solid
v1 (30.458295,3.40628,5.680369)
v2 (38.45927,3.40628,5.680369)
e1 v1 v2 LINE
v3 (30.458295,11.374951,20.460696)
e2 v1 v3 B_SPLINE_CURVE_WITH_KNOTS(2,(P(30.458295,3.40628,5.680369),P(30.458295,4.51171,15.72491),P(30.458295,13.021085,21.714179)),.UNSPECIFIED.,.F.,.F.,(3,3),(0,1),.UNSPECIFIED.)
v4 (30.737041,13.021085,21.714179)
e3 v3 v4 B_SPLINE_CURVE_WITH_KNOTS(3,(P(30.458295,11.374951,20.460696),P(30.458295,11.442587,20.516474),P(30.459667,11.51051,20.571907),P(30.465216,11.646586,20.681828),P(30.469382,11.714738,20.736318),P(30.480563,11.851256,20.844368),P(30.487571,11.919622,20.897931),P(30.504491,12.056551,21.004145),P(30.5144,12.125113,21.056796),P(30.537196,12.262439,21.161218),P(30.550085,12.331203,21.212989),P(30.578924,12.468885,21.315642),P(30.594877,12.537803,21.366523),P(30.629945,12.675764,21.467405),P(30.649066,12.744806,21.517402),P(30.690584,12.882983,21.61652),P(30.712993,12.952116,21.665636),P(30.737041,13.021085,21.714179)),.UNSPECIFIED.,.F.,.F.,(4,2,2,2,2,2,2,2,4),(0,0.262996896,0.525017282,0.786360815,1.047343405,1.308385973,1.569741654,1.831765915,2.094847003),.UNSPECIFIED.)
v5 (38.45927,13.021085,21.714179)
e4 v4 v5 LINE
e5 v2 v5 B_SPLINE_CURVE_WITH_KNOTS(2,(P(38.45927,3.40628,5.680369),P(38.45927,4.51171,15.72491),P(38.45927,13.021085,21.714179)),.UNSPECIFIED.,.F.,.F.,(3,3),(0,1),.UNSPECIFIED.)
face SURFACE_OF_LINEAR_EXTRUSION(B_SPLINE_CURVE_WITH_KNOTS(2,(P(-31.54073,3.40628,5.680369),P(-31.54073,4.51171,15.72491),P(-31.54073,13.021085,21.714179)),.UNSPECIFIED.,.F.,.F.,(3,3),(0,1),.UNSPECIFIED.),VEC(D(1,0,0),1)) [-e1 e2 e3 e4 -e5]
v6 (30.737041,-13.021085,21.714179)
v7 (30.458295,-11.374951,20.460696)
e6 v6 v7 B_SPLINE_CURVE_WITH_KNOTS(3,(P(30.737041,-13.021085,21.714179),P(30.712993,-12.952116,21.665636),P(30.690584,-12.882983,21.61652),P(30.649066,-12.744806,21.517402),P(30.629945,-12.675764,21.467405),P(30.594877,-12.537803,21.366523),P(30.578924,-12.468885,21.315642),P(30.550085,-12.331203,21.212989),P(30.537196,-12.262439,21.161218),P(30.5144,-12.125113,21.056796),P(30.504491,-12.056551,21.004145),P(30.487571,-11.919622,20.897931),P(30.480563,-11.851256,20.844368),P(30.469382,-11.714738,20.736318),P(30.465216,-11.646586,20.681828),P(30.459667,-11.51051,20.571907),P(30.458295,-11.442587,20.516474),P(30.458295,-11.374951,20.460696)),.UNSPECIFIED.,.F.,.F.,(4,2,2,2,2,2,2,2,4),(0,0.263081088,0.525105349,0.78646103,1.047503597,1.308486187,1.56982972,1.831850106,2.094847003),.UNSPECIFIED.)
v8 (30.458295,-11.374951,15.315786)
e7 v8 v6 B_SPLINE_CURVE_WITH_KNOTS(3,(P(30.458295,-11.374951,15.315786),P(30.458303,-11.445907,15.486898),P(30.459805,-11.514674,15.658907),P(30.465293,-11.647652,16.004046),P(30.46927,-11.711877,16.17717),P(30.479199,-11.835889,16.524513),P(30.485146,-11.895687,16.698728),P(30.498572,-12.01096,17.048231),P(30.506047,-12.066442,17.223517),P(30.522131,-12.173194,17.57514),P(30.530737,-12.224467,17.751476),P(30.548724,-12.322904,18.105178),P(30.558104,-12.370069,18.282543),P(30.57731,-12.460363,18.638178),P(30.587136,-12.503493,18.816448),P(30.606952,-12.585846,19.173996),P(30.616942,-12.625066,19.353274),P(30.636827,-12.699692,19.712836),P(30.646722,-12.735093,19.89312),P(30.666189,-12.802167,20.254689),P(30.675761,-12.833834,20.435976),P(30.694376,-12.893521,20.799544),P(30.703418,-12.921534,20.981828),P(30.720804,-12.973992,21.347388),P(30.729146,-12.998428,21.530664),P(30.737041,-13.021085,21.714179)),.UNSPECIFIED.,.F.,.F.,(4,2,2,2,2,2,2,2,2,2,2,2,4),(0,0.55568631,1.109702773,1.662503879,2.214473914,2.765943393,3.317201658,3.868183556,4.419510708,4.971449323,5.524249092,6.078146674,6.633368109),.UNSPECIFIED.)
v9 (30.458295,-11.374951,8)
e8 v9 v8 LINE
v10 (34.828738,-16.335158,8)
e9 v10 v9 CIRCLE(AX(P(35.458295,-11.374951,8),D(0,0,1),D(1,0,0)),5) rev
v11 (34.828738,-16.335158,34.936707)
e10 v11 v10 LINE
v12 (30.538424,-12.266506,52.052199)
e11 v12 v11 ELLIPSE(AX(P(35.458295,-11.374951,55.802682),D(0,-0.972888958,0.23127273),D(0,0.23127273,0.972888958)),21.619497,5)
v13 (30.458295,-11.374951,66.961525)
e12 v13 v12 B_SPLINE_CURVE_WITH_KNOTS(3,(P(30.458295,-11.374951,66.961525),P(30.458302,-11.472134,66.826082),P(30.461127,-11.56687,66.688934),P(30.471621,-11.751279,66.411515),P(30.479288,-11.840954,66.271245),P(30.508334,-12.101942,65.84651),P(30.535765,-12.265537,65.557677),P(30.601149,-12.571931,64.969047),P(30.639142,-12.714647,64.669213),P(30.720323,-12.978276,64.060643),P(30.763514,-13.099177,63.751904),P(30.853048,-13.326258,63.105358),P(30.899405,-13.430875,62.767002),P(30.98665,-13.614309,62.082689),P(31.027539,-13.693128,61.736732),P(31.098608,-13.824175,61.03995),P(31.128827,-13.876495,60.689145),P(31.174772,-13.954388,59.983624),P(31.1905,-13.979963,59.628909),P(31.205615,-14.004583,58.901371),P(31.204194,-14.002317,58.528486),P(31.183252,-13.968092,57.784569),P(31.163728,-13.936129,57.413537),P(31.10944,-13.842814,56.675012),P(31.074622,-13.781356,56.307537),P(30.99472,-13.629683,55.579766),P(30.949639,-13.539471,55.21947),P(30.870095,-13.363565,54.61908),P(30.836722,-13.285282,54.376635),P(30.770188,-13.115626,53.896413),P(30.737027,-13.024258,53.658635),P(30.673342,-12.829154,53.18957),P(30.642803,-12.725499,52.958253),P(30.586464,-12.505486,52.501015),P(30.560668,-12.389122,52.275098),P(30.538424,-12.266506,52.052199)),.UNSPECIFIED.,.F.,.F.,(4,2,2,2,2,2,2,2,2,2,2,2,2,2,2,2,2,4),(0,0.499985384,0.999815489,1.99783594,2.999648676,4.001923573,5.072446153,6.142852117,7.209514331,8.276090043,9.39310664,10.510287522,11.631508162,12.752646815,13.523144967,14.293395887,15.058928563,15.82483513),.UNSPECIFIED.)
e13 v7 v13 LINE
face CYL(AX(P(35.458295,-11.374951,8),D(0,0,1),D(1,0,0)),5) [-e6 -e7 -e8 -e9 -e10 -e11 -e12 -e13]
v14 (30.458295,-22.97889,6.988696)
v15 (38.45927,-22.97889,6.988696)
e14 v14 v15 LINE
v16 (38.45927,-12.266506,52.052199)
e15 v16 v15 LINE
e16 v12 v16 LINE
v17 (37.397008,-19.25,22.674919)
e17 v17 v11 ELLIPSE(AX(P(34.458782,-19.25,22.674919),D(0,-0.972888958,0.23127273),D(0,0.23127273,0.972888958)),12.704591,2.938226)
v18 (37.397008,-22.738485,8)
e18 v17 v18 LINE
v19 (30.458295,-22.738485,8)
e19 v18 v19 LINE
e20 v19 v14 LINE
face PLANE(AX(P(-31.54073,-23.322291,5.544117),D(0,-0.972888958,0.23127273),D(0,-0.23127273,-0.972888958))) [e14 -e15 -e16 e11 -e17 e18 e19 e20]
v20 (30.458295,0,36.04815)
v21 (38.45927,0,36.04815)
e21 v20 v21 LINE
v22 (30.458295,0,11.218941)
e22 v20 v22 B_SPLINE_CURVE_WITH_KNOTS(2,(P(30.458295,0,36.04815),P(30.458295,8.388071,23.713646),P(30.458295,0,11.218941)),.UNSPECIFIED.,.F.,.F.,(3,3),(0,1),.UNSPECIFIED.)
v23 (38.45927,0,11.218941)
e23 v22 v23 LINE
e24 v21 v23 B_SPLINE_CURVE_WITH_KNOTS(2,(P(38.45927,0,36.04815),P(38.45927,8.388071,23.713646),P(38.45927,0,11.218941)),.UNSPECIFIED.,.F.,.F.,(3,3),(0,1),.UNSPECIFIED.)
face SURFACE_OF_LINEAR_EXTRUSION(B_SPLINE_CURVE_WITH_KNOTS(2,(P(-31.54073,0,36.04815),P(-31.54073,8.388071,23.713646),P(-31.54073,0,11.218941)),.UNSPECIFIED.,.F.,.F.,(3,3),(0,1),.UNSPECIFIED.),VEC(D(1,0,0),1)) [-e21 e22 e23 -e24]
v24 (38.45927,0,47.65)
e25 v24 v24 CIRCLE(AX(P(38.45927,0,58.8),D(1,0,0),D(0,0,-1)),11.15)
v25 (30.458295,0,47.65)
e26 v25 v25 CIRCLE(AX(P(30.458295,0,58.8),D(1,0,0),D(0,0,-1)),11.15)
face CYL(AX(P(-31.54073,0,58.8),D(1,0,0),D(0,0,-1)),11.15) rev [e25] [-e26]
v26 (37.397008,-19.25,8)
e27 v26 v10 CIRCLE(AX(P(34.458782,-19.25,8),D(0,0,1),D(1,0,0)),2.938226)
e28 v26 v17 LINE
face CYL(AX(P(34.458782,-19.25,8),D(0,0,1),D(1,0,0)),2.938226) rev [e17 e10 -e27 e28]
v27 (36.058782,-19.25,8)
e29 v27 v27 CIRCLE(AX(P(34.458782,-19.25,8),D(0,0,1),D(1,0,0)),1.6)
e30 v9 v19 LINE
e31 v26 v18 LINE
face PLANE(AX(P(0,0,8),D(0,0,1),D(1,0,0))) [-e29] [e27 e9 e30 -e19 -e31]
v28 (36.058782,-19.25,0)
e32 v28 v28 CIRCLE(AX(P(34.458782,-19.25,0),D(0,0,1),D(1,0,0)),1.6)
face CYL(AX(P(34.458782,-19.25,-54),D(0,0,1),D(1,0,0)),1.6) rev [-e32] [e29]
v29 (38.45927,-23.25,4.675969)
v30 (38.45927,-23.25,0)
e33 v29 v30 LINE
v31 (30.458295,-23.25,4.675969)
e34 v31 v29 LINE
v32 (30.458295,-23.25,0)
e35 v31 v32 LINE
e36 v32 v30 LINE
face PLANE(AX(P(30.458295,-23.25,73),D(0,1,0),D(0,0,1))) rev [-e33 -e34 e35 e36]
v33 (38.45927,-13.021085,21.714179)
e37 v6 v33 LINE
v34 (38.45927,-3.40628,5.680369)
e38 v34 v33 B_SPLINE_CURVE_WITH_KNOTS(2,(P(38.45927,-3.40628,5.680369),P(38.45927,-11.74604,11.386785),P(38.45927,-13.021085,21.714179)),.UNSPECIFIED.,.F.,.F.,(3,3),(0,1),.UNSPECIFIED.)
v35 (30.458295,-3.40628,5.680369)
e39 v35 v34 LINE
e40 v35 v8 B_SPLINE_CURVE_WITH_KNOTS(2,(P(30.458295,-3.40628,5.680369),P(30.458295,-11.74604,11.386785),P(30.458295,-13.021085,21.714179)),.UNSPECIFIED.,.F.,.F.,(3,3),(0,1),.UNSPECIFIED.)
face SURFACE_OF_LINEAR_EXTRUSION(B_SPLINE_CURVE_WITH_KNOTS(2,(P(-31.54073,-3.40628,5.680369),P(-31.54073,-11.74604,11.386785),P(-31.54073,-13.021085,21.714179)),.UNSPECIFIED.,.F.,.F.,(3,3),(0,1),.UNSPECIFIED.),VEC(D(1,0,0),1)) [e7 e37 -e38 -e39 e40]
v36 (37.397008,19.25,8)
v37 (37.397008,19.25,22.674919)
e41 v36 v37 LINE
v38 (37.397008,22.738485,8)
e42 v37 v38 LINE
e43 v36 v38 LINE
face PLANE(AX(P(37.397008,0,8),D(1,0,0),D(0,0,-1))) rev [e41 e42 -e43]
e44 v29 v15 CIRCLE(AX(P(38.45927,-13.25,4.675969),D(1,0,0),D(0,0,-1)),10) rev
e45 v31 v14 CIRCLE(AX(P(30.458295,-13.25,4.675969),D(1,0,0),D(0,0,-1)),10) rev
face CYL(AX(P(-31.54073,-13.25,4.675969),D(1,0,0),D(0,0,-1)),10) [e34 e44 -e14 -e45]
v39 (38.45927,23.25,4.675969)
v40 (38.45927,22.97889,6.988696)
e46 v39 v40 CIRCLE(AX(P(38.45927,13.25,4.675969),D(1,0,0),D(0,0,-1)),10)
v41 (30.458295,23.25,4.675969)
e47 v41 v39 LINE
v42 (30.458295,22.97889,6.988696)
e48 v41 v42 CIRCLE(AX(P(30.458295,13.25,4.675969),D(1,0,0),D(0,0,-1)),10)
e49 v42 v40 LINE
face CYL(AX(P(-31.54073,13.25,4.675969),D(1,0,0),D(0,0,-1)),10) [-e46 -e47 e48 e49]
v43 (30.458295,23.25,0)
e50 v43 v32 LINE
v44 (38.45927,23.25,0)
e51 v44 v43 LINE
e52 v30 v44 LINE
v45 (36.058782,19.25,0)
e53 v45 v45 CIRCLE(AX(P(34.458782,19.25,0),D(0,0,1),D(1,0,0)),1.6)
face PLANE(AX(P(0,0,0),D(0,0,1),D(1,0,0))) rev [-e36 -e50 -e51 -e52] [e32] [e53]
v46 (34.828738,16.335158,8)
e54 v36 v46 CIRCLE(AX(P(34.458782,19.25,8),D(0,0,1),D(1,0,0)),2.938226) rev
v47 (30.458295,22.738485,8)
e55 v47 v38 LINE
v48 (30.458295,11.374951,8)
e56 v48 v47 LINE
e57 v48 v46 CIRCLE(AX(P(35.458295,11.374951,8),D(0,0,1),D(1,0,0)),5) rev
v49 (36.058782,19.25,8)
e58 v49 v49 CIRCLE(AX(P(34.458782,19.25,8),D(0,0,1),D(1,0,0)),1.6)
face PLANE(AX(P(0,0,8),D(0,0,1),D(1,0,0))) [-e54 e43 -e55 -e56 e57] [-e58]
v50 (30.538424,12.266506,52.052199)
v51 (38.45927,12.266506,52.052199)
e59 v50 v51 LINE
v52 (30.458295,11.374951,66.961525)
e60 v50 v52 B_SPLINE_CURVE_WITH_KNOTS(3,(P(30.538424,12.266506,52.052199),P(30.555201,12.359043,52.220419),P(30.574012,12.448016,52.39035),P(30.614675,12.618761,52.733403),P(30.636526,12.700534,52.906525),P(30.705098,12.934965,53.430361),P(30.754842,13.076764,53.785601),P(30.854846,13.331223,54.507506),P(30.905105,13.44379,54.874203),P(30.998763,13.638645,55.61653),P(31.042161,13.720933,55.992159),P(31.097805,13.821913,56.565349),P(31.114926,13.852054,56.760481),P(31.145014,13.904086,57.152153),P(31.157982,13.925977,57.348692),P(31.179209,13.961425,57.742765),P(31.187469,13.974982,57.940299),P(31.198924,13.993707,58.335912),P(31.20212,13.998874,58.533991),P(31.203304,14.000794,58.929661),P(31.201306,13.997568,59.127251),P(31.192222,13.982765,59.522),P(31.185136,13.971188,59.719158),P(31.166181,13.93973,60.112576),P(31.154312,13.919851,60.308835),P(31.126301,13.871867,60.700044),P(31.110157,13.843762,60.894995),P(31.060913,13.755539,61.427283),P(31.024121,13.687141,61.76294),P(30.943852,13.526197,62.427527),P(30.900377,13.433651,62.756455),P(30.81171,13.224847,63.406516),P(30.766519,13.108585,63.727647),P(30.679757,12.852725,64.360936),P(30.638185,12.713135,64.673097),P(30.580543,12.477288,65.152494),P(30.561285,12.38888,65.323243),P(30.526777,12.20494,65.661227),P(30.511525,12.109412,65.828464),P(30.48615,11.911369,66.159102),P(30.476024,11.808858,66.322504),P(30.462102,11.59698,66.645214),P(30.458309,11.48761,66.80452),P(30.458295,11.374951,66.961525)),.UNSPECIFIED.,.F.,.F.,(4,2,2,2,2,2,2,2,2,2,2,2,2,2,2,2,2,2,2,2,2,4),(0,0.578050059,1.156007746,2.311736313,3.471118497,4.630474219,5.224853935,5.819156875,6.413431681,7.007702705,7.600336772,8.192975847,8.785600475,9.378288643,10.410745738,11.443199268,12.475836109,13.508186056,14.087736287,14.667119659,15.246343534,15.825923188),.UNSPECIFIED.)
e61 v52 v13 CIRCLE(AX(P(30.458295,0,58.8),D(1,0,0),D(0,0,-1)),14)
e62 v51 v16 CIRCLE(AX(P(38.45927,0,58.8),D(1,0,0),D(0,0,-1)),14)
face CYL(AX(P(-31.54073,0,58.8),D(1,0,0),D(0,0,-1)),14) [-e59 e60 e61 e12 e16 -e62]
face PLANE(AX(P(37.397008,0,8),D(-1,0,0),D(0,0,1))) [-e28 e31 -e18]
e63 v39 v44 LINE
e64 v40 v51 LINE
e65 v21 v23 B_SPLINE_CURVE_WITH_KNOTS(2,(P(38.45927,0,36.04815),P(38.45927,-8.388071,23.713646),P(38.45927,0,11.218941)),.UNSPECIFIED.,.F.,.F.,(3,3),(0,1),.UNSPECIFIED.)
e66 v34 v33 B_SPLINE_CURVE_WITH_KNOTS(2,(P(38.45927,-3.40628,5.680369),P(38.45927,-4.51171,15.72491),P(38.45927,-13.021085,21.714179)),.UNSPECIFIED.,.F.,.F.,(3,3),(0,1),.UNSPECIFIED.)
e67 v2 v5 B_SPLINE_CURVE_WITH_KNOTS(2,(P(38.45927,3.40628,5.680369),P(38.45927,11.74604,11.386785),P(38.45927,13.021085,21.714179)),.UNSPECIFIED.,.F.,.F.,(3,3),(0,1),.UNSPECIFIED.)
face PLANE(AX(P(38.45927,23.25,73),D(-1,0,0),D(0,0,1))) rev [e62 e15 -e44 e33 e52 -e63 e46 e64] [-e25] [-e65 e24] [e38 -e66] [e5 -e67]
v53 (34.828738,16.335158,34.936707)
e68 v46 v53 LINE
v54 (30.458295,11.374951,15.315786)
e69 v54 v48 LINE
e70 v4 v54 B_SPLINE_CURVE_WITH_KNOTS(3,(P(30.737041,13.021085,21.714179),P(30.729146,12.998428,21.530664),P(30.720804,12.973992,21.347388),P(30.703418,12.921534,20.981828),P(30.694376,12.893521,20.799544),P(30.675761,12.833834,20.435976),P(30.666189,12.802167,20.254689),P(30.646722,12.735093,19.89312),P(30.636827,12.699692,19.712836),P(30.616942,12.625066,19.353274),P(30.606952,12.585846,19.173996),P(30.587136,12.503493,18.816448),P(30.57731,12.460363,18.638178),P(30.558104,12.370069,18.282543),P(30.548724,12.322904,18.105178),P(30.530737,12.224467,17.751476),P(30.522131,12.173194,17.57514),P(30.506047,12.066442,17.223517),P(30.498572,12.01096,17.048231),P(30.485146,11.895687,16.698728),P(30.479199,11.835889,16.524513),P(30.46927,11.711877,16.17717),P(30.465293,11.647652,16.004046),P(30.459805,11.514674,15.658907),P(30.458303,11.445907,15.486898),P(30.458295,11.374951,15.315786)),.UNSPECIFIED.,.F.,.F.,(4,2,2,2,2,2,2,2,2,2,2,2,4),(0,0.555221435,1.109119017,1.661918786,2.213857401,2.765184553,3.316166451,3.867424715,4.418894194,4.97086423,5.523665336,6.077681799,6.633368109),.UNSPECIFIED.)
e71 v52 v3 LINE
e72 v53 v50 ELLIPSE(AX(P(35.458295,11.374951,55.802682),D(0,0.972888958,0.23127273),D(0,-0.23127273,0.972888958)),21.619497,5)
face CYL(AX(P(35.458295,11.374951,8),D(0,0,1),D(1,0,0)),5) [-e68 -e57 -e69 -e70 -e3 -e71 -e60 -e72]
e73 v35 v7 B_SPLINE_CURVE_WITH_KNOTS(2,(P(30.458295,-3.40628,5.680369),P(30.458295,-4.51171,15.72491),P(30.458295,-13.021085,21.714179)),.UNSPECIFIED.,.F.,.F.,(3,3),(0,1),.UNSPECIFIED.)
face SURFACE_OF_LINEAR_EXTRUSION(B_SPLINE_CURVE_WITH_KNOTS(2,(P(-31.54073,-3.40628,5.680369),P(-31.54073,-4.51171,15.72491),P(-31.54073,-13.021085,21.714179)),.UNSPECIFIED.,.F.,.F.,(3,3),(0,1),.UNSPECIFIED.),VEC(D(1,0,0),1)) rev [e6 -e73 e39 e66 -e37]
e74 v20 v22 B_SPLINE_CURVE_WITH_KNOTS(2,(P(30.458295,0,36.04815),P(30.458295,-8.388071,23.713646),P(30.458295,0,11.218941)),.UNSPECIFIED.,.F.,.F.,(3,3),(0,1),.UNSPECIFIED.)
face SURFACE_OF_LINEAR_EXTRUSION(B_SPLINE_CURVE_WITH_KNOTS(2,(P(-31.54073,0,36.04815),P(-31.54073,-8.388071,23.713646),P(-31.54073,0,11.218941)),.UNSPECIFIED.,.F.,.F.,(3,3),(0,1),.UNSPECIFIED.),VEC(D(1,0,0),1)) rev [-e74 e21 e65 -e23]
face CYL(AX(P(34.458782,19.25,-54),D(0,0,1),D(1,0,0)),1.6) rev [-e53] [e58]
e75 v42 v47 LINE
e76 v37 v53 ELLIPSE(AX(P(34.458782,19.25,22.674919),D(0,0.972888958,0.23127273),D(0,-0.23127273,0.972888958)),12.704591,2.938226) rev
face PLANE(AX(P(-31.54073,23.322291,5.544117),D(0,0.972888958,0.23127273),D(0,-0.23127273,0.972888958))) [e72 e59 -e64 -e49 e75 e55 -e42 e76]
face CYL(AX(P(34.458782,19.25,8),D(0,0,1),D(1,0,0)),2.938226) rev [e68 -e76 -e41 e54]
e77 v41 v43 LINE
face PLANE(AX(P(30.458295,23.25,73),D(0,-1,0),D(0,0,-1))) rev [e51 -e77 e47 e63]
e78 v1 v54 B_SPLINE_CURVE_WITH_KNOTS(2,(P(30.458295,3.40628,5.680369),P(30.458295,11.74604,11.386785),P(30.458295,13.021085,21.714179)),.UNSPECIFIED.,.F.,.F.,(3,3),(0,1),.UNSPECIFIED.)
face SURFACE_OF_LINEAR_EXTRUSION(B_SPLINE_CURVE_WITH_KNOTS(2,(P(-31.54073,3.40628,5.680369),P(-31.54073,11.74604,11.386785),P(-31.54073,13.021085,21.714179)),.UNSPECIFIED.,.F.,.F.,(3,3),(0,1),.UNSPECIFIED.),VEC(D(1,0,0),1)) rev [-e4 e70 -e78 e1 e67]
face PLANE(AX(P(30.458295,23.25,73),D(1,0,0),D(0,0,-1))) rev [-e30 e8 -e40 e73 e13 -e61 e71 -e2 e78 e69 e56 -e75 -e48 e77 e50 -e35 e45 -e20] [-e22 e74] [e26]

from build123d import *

# Parameters (mm, degrees)
SKETCH1_W           = 8.000974829
SKETCH1_H           = 46.5
BOSS_EXTRUDE1_DEPTH = 73
SKETCH2_R           = 11.15
CUT_EXTRUDE1_DEPTH  = 70
CUT_EXTRUDE3_DEPTH  = 62
SKETCH5_R           = 1.6
CUT_EXTRUDE4_DEPTH  = 62
FILLET2_START       = 8
FILLET2_DEPTH       = 60


with BuildPart() as part:
    # Sketch1 → Boss-Extrude1 (new body)
    with BuildSketch(Plane.XY):
        with Locations((34.458782271, 0)):
            Rectangle(SKETCH1_W, SKETCH1_H)
    extrude(amount=BOSS_EXTRUDE1_DEPTH)

    # Sketch2 → Cut-Extrude1 (cut)
    with BuildSketch(Plane(origin=(38.459269685, 0, 0), x_dir=(0, 0, -1), z_dir=(1, 0, 0))):
        with Locations((-58.8, 0)):
            Circle(SKETCH2_R)
        with BuildLine():
            Line((-73, -23.25), (-4.675968949, -23.25))
            ThreePointArc((-4.675968949, -23.25), (-5.84025075, -23.181991134), (-6.988696254, -22.978889578))
            Line((-6.988696254, -22.978889578), (-52.052198848, -12.266506414))
            ThreePointArc((-52.052198848, -12.266506414), (-63.616991815, -13.14521167), (-71.875840062, -5.002240165))
            Line((-71.875840062, -5.002240165), (-73, -8))
            Line((-73, -8), (-73, -23.25))
        make_face()
        with BuildLine():
            Line((-73, 23.25), (-73, 8))
            Line((-73, 8), (-71.875840062, 5.002240165))
            ThreePointArc((-71.875840062, 5.002240165), (-63.616991815, 13.14521167), (-52.052198848, 12.266506414))
            Line((-52.052198848, 12.266506414), (-6.988696254, 22.978889578))
            ThreePointArc((-6.988696254, 22.978889578), (-5.84025075, 23.181991134), (-4.675968949, 23.25))
            Line((-4.675968949, 23.25), (-73, 23.25))
        make_face()
        with BuildLine():
            Line((-73, 8), (-73, -8))
            Line((-73, -8), (-71.875840062, -5.002240165))
            ThreePointArc((-71.875840062, -5.002240165), (-72.8, 0), (-71.875840062, 5.002240165))
            Line((-71.875840062, 5.002240165), (-73, 8))
        make_face()
        with BuildLine():
            add(Edge.make_bspline(
                [(-5.680368735, -3.40627966), (-11.386784663, -11.746039667), (-21.714178832, -13.021085274)],
                knots=[0, 0, 0, 1, 1, 1], degree=2))
            add(Edge.make_bspline(
                [(-5.680368735, -3.40627966), (-15.724909711, -4.511710031), (-21.714178832, -13.021085274)],
                knots=[0, 0, 0, 1, 1, 1], degree=2))
        make_face()
        with BuildLine():
            add(Edge.make_bspline(
                [(-36.048150351, 0), (-23.713645553, 8.388071288), (-11.218940507, 0)],
                knots=[0, 0, 0, 1, 1, 1], degree=2))
            add(Edge.make_bspline(
                [(-36.048150351, 0), (-23.713645553, -8.388071288), (-11.218940507, 0)],
                knots=[0, 0, 0, 1, 1, 1], degree=2))
        make_face()
        with BuildLine():
            add(Edge.make_bspline(
                [(-5.680368735, 3.40627966), (-15.724909711, 4.511710031), (-21.714178832, 13.021085274)],
                knots=[0, 0, 0, 1, 1, 1], degree=2))
            add(Edge.make_bspline(
                [(-5.680368735, 3.40627966), (-11.386784663, 11.746039667), (-21.714178832, 13.021085274)],
                knots=[0, 0, 0, 1, 1, 1], degree=2))
        make_face()
    extrude(amount=-CUT_EXTRUDE1_DEPTH, mode=Mode.SUBTRACT)

    # Sketch4 → Cut-Extrude3 (cut)
    with BuildSketch(Plane.XY.offset(70)):
        with BuildLine():
            ThreePointArc((37.397007822, -19.25), (36.536421482, -17.172360788), (34.458782271, -16.311774449))
            Line((34.458782271, -16.311774449), (30.458294856, -16.311774449))
            Line((30.458294856, -16.311774449), (30.458294856, -22.188225551))
            Line((30.458294856, -22.188225551), (30.458294856, -24.738187672))
            Line((30.458294856, -24.738187672), (37.397007822, -23.25))
            Line((37.397007822, -23.25), (37.397007822, -19.25))
        make_face()
        with BuildLine():
            Line((30.458294856, 24.500594278), (30.458294856, 22.188225551))
            Line((30.458294856, 22.188225551), (30.458294856, 16.311774449))
            Line((30.458294856, 16.311774449), (34.458782271, 16.311774449))
            ThreePointArc((34.458782271, 16.311774449), (36.536421482, 17.172360788), (37.397007822, 19.25))
            Line((37.397007822, 19.25), (37.397007822, 23.25))
            Line((37.397007822, 23.25), (30.458294856, 24.500594278))
        make_face()
    extrude(amount=-CUT_EXTRUDE3_DEPTH, mode=Mode.SUBTRACT)

    # Sketch5 → Cut-Extrude4 (cut)
    with BuildSketch(Plane.XY.offset(8)):
        with Locations((34.458782271, 19.25)):
            Circle(SKETCH5_R)
        with Locations((34.458782271, -19.25)):
            Circle(SKETCH5_R)
    extrude(amount=-CUT_EXTRUDE4_DEPTH, mode=Mode.SUBTRACT)

    # Fillet2: read off the stored shape, not the designer's step
    # Fillet2 outline → Fillet2 (cut)
    with BuildSketch(Plane.XY.offset(FILLET2_START)):
        with BuildLine():
            ThreePointArc((34.828738175, -16.33515832), (31.706776269, -14.680417252), (30.458294856, -11.374950824))
            Line((30.458294856, -11.374950824), (30.458294856, -16.311774449))
            Line((30.458294856, -16.311774449), (34.458782271, -16.311774449))
            ThreePointArc((34.458782271, -16.311774449), (34.644129362, -16.317626244), (34.828738175, -16.33515832))
        make_face()
        with BuildLine():
            Line((30.458294856, 16.311774449), (30.458294856, 11.374950826))
            ThreePointArc((30.458294856, 11.374950826), (31.70677627, 14.680417253), (34.828738175, 16.33515832))
            ThreePointArc((34.828738175, 16.33515832), (34.644129362, 16.317626244), (34.458782271, 16.311774449))
            Line((34.458782271, 16.311774449), (30.458294856, 16.311774449))
        make_face()
    extrude(amount=FILLET2_DEPTH, mode=Mode.SUBTRACT)


solid = part.part
